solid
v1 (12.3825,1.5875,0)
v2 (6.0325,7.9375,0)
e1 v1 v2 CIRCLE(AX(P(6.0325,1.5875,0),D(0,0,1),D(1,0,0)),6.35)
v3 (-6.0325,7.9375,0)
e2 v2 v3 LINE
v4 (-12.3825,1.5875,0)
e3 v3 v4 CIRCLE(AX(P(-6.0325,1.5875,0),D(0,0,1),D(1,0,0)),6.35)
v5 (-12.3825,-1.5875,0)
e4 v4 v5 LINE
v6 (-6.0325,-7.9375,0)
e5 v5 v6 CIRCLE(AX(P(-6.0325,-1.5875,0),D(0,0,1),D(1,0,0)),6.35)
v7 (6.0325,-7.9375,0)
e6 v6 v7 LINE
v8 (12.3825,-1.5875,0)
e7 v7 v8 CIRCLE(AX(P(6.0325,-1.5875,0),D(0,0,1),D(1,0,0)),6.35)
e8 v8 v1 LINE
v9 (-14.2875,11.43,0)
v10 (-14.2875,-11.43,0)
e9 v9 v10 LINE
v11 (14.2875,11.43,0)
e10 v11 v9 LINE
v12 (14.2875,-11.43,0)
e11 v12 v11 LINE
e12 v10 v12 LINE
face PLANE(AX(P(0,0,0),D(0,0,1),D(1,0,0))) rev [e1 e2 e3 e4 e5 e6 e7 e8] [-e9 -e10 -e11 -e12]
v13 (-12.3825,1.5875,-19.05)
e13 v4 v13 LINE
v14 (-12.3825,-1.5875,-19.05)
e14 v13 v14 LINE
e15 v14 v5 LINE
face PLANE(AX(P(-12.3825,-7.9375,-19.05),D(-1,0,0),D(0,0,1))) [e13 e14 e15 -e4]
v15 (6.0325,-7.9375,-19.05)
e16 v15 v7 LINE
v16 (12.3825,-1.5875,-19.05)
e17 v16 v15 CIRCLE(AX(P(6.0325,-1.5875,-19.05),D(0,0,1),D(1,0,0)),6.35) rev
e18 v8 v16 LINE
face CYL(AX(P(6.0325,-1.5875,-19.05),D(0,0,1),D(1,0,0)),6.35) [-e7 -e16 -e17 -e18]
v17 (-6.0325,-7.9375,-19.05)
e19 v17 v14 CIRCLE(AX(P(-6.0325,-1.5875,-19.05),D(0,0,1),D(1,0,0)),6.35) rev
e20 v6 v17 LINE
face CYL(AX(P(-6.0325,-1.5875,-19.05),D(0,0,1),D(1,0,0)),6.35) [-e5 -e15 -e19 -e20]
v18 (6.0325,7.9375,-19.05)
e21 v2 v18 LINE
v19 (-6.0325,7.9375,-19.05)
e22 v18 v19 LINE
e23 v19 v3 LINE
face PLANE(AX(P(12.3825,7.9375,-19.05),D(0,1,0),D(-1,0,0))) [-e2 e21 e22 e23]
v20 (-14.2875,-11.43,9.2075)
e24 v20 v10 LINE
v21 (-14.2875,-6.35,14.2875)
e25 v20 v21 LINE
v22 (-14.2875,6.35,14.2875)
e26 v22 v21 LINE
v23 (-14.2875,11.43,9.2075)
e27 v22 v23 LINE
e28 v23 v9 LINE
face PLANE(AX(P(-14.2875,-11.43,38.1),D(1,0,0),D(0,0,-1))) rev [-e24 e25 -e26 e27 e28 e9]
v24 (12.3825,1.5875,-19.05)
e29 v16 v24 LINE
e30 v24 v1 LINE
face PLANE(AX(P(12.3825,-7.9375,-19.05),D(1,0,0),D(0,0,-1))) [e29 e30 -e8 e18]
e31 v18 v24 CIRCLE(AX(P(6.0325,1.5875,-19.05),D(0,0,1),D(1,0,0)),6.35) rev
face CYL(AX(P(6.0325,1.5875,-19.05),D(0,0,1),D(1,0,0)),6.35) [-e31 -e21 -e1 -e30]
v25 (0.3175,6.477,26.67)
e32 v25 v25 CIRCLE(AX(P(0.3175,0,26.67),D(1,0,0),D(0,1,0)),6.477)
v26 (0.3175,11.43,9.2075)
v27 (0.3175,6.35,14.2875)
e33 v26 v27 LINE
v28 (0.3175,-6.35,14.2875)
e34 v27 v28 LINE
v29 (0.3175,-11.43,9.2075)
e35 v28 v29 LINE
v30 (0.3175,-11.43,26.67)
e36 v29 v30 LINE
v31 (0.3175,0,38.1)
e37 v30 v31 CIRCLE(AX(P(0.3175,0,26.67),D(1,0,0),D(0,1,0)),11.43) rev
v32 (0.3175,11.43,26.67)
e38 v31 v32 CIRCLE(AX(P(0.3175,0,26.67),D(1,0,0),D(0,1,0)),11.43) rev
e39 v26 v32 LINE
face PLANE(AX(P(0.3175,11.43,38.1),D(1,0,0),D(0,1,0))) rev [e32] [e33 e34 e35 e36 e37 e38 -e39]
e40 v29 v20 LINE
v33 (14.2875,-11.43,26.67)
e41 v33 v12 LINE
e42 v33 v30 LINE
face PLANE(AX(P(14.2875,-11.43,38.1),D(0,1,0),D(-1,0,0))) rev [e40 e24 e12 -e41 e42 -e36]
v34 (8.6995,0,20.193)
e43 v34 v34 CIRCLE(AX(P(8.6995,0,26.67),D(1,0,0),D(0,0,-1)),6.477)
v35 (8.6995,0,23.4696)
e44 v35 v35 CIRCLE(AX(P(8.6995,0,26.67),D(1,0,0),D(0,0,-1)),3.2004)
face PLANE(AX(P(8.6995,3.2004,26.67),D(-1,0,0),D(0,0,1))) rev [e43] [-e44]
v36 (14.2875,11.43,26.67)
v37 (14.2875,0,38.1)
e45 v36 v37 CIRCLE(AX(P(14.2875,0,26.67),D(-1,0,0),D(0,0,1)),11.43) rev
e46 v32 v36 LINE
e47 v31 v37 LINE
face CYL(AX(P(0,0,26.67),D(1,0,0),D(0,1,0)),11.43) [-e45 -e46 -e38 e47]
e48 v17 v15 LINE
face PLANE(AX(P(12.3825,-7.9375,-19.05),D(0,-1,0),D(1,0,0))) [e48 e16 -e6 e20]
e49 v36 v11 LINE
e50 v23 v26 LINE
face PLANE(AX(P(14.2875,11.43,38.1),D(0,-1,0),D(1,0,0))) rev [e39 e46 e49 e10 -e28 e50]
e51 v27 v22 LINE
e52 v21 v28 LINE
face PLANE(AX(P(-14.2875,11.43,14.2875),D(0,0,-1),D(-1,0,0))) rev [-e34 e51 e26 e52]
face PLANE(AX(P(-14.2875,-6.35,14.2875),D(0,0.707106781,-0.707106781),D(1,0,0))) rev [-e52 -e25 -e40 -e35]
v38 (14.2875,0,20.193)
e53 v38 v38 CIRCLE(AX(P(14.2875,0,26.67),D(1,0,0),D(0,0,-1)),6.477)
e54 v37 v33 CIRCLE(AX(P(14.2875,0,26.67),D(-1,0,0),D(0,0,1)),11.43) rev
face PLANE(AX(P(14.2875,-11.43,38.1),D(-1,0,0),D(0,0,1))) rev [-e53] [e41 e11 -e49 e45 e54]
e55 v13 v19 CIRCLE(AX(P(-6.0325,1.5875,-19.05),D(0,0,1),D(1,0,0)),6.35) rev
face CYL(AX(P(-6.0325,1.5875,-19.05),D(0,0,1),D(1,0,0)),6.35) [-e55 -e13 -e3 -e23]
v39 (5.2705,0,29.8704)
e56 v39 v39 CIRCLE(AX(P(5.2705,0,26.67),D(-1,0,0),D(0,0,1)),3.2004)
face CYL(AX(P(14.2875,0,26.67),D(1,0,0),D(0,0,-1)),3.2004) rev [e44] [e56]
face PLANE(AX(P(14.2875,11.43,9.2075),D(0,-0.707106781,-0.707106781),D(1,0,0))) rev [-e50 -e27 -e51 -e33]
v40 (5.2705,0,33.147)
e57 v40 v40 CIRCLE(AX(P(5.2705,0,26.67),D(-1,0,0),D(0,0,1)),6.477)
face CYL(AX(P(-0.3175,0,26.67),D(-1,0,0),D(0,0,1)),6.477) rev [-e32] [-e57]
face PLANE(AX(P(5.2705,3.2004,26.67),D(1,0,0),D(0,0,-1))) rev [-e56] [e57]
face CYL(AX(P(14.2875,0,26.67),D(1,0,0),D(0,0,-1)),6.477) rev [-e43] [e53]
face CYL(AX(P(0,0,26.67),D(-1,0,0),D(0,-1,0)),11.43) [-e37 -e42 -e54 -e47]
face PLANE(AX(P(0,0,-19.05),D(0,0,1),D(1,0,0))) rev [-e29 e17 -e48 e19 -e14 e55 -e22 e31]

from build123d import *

# Parameters (mm, degrees)
SKETCH2_W                                            = 24.765
SKETCH2_H                                            = 15.875
BOSS_EXTRUDE1_DEPTH                                  = 19.05
SKETCH3_W                                            = 28.575
SKETCH3_H                                            = 22.86
BOSS_EXTRUDE2_DEPTH                                  = 38.1
SKETCH4_W                                            = 14.605
SKETCH4_H                                            = 23.8125
CUT_EXTRUDE1_DEPTH                                   = 47.6725
FILLET5_R                                            = 11.43
FILLET3_R                                            = 6.35
CHAMFER1_SIZE                                        = 5.08
CBORE_FOR_1_4_FILLISTER_HEAD_MACHINE_SCR_D           = 6.4008
CBORE_FOR_1_4_FILLISTER_HEAD_MACHINE_SCR_CBORE_D     = 12.954
CBORE_FOR_1_4_FILLISTER_HEAD_MACHINE_SCR_CBORE_DEPTH = 5.588


with BuildPart() as part:
    # Sketch2 → Boss-Extrude1 (new body)
    with BuildSketch(Plane.XY):
        Rectangle(SKETCH2_W, SKETCH2_H)
    extrude(amount=-BOSS_EXTRUDE1_DEPTH)

    # Sketch3 → Boss-Extrude2 (add)
    with BuildSketch(Plane.XY):
        Rectangle(SKETCH3_W, SKETCH3_H)
    extrude(amount=BOSS_EXTRUDE2_DEPTH)

    # Sketch4 → Cut-Extrude1 (cut, through all)
    with BuildSketch(Plane(origin=(0, -11.43, 0), x_dir=(-1, 0, 0), z_dir=(0, -1, 0))):
        with Locations((6.985, -26.19375)):
            Rectangle(SKETCH4_W, SKETCH4_H)
    extrude(amount=-CUT_EXTRUDE1_DEPTH, mode=Mode.SUBTRACT)

    # Fillet5
    fillet5_edges = [part.edges().sort_by_distance(p)[0] for p in [
        (7.3025, -11.43, 38.1),
        (7.3025, 11.43, 38.1),
    ]]
    fillet(fillet5_edges, radius=FILLET5_R - 0.0001)  # a hair under: the kernel refuses the full size

    # Fillet3
    fillet3_edges = [part.edges().sort_by_distance(p)[0] for p in [
        (-12.3825, 7.9375, -9.525),
        (12.3825, 7.9375, -9.525),
        (12.3825, -7.9375, -9.525),
        (-12.3825, -7.9375, -9.525),
    ]]
    fillet(fillet3_edges, radius=FILLET3_R)

    # Chamfer1
    chamfer1_edges = [part.edges().sort_by_distance(p)[0] for p in [
        (-6.985, 11.43, 14.2875),
        (-6.985, -11.43, 14.2875),
    ]]
    chamfer(chamfer1_edges, length=CHAMFER1_SIZE)

    # CBORE for 1/4 Fillister Head Machine Screw1 (through all)
    with Locations(Plane(origin=(14.2875, 0, 26.67), x_dir=(0, 0, 1), z_dir=(1, 0, 0))):
        with Locations((0, 0)):
            cbore_for_1_4_fillister_head_machine_scr = CounterBoreHole(CBORE_FOR_1_4_FILLISTER_HEAD_MACHINE_SCR_D / 2, CBORE_FOR_1_4_FILLISTER_HEAD_MACHINE_SCR_CBORE_D / 2, CBORE_FOR_1_4_FILLISTER_HEAD_MACHINE_SCR_CBORE_DEPTH)

    # Mirror1: CBORE for 1/4 Fillister Head Machine Screw1 across plane
    add(cbore_for_1_4_fillister_head_machine_scr.mirror(Plane(origin=(6.985, 0, 0), x_dir=(0, 0, 1), z_dir=(1, 0, 0))), mode=Mode.SUBTRACT)


solid = part.part
